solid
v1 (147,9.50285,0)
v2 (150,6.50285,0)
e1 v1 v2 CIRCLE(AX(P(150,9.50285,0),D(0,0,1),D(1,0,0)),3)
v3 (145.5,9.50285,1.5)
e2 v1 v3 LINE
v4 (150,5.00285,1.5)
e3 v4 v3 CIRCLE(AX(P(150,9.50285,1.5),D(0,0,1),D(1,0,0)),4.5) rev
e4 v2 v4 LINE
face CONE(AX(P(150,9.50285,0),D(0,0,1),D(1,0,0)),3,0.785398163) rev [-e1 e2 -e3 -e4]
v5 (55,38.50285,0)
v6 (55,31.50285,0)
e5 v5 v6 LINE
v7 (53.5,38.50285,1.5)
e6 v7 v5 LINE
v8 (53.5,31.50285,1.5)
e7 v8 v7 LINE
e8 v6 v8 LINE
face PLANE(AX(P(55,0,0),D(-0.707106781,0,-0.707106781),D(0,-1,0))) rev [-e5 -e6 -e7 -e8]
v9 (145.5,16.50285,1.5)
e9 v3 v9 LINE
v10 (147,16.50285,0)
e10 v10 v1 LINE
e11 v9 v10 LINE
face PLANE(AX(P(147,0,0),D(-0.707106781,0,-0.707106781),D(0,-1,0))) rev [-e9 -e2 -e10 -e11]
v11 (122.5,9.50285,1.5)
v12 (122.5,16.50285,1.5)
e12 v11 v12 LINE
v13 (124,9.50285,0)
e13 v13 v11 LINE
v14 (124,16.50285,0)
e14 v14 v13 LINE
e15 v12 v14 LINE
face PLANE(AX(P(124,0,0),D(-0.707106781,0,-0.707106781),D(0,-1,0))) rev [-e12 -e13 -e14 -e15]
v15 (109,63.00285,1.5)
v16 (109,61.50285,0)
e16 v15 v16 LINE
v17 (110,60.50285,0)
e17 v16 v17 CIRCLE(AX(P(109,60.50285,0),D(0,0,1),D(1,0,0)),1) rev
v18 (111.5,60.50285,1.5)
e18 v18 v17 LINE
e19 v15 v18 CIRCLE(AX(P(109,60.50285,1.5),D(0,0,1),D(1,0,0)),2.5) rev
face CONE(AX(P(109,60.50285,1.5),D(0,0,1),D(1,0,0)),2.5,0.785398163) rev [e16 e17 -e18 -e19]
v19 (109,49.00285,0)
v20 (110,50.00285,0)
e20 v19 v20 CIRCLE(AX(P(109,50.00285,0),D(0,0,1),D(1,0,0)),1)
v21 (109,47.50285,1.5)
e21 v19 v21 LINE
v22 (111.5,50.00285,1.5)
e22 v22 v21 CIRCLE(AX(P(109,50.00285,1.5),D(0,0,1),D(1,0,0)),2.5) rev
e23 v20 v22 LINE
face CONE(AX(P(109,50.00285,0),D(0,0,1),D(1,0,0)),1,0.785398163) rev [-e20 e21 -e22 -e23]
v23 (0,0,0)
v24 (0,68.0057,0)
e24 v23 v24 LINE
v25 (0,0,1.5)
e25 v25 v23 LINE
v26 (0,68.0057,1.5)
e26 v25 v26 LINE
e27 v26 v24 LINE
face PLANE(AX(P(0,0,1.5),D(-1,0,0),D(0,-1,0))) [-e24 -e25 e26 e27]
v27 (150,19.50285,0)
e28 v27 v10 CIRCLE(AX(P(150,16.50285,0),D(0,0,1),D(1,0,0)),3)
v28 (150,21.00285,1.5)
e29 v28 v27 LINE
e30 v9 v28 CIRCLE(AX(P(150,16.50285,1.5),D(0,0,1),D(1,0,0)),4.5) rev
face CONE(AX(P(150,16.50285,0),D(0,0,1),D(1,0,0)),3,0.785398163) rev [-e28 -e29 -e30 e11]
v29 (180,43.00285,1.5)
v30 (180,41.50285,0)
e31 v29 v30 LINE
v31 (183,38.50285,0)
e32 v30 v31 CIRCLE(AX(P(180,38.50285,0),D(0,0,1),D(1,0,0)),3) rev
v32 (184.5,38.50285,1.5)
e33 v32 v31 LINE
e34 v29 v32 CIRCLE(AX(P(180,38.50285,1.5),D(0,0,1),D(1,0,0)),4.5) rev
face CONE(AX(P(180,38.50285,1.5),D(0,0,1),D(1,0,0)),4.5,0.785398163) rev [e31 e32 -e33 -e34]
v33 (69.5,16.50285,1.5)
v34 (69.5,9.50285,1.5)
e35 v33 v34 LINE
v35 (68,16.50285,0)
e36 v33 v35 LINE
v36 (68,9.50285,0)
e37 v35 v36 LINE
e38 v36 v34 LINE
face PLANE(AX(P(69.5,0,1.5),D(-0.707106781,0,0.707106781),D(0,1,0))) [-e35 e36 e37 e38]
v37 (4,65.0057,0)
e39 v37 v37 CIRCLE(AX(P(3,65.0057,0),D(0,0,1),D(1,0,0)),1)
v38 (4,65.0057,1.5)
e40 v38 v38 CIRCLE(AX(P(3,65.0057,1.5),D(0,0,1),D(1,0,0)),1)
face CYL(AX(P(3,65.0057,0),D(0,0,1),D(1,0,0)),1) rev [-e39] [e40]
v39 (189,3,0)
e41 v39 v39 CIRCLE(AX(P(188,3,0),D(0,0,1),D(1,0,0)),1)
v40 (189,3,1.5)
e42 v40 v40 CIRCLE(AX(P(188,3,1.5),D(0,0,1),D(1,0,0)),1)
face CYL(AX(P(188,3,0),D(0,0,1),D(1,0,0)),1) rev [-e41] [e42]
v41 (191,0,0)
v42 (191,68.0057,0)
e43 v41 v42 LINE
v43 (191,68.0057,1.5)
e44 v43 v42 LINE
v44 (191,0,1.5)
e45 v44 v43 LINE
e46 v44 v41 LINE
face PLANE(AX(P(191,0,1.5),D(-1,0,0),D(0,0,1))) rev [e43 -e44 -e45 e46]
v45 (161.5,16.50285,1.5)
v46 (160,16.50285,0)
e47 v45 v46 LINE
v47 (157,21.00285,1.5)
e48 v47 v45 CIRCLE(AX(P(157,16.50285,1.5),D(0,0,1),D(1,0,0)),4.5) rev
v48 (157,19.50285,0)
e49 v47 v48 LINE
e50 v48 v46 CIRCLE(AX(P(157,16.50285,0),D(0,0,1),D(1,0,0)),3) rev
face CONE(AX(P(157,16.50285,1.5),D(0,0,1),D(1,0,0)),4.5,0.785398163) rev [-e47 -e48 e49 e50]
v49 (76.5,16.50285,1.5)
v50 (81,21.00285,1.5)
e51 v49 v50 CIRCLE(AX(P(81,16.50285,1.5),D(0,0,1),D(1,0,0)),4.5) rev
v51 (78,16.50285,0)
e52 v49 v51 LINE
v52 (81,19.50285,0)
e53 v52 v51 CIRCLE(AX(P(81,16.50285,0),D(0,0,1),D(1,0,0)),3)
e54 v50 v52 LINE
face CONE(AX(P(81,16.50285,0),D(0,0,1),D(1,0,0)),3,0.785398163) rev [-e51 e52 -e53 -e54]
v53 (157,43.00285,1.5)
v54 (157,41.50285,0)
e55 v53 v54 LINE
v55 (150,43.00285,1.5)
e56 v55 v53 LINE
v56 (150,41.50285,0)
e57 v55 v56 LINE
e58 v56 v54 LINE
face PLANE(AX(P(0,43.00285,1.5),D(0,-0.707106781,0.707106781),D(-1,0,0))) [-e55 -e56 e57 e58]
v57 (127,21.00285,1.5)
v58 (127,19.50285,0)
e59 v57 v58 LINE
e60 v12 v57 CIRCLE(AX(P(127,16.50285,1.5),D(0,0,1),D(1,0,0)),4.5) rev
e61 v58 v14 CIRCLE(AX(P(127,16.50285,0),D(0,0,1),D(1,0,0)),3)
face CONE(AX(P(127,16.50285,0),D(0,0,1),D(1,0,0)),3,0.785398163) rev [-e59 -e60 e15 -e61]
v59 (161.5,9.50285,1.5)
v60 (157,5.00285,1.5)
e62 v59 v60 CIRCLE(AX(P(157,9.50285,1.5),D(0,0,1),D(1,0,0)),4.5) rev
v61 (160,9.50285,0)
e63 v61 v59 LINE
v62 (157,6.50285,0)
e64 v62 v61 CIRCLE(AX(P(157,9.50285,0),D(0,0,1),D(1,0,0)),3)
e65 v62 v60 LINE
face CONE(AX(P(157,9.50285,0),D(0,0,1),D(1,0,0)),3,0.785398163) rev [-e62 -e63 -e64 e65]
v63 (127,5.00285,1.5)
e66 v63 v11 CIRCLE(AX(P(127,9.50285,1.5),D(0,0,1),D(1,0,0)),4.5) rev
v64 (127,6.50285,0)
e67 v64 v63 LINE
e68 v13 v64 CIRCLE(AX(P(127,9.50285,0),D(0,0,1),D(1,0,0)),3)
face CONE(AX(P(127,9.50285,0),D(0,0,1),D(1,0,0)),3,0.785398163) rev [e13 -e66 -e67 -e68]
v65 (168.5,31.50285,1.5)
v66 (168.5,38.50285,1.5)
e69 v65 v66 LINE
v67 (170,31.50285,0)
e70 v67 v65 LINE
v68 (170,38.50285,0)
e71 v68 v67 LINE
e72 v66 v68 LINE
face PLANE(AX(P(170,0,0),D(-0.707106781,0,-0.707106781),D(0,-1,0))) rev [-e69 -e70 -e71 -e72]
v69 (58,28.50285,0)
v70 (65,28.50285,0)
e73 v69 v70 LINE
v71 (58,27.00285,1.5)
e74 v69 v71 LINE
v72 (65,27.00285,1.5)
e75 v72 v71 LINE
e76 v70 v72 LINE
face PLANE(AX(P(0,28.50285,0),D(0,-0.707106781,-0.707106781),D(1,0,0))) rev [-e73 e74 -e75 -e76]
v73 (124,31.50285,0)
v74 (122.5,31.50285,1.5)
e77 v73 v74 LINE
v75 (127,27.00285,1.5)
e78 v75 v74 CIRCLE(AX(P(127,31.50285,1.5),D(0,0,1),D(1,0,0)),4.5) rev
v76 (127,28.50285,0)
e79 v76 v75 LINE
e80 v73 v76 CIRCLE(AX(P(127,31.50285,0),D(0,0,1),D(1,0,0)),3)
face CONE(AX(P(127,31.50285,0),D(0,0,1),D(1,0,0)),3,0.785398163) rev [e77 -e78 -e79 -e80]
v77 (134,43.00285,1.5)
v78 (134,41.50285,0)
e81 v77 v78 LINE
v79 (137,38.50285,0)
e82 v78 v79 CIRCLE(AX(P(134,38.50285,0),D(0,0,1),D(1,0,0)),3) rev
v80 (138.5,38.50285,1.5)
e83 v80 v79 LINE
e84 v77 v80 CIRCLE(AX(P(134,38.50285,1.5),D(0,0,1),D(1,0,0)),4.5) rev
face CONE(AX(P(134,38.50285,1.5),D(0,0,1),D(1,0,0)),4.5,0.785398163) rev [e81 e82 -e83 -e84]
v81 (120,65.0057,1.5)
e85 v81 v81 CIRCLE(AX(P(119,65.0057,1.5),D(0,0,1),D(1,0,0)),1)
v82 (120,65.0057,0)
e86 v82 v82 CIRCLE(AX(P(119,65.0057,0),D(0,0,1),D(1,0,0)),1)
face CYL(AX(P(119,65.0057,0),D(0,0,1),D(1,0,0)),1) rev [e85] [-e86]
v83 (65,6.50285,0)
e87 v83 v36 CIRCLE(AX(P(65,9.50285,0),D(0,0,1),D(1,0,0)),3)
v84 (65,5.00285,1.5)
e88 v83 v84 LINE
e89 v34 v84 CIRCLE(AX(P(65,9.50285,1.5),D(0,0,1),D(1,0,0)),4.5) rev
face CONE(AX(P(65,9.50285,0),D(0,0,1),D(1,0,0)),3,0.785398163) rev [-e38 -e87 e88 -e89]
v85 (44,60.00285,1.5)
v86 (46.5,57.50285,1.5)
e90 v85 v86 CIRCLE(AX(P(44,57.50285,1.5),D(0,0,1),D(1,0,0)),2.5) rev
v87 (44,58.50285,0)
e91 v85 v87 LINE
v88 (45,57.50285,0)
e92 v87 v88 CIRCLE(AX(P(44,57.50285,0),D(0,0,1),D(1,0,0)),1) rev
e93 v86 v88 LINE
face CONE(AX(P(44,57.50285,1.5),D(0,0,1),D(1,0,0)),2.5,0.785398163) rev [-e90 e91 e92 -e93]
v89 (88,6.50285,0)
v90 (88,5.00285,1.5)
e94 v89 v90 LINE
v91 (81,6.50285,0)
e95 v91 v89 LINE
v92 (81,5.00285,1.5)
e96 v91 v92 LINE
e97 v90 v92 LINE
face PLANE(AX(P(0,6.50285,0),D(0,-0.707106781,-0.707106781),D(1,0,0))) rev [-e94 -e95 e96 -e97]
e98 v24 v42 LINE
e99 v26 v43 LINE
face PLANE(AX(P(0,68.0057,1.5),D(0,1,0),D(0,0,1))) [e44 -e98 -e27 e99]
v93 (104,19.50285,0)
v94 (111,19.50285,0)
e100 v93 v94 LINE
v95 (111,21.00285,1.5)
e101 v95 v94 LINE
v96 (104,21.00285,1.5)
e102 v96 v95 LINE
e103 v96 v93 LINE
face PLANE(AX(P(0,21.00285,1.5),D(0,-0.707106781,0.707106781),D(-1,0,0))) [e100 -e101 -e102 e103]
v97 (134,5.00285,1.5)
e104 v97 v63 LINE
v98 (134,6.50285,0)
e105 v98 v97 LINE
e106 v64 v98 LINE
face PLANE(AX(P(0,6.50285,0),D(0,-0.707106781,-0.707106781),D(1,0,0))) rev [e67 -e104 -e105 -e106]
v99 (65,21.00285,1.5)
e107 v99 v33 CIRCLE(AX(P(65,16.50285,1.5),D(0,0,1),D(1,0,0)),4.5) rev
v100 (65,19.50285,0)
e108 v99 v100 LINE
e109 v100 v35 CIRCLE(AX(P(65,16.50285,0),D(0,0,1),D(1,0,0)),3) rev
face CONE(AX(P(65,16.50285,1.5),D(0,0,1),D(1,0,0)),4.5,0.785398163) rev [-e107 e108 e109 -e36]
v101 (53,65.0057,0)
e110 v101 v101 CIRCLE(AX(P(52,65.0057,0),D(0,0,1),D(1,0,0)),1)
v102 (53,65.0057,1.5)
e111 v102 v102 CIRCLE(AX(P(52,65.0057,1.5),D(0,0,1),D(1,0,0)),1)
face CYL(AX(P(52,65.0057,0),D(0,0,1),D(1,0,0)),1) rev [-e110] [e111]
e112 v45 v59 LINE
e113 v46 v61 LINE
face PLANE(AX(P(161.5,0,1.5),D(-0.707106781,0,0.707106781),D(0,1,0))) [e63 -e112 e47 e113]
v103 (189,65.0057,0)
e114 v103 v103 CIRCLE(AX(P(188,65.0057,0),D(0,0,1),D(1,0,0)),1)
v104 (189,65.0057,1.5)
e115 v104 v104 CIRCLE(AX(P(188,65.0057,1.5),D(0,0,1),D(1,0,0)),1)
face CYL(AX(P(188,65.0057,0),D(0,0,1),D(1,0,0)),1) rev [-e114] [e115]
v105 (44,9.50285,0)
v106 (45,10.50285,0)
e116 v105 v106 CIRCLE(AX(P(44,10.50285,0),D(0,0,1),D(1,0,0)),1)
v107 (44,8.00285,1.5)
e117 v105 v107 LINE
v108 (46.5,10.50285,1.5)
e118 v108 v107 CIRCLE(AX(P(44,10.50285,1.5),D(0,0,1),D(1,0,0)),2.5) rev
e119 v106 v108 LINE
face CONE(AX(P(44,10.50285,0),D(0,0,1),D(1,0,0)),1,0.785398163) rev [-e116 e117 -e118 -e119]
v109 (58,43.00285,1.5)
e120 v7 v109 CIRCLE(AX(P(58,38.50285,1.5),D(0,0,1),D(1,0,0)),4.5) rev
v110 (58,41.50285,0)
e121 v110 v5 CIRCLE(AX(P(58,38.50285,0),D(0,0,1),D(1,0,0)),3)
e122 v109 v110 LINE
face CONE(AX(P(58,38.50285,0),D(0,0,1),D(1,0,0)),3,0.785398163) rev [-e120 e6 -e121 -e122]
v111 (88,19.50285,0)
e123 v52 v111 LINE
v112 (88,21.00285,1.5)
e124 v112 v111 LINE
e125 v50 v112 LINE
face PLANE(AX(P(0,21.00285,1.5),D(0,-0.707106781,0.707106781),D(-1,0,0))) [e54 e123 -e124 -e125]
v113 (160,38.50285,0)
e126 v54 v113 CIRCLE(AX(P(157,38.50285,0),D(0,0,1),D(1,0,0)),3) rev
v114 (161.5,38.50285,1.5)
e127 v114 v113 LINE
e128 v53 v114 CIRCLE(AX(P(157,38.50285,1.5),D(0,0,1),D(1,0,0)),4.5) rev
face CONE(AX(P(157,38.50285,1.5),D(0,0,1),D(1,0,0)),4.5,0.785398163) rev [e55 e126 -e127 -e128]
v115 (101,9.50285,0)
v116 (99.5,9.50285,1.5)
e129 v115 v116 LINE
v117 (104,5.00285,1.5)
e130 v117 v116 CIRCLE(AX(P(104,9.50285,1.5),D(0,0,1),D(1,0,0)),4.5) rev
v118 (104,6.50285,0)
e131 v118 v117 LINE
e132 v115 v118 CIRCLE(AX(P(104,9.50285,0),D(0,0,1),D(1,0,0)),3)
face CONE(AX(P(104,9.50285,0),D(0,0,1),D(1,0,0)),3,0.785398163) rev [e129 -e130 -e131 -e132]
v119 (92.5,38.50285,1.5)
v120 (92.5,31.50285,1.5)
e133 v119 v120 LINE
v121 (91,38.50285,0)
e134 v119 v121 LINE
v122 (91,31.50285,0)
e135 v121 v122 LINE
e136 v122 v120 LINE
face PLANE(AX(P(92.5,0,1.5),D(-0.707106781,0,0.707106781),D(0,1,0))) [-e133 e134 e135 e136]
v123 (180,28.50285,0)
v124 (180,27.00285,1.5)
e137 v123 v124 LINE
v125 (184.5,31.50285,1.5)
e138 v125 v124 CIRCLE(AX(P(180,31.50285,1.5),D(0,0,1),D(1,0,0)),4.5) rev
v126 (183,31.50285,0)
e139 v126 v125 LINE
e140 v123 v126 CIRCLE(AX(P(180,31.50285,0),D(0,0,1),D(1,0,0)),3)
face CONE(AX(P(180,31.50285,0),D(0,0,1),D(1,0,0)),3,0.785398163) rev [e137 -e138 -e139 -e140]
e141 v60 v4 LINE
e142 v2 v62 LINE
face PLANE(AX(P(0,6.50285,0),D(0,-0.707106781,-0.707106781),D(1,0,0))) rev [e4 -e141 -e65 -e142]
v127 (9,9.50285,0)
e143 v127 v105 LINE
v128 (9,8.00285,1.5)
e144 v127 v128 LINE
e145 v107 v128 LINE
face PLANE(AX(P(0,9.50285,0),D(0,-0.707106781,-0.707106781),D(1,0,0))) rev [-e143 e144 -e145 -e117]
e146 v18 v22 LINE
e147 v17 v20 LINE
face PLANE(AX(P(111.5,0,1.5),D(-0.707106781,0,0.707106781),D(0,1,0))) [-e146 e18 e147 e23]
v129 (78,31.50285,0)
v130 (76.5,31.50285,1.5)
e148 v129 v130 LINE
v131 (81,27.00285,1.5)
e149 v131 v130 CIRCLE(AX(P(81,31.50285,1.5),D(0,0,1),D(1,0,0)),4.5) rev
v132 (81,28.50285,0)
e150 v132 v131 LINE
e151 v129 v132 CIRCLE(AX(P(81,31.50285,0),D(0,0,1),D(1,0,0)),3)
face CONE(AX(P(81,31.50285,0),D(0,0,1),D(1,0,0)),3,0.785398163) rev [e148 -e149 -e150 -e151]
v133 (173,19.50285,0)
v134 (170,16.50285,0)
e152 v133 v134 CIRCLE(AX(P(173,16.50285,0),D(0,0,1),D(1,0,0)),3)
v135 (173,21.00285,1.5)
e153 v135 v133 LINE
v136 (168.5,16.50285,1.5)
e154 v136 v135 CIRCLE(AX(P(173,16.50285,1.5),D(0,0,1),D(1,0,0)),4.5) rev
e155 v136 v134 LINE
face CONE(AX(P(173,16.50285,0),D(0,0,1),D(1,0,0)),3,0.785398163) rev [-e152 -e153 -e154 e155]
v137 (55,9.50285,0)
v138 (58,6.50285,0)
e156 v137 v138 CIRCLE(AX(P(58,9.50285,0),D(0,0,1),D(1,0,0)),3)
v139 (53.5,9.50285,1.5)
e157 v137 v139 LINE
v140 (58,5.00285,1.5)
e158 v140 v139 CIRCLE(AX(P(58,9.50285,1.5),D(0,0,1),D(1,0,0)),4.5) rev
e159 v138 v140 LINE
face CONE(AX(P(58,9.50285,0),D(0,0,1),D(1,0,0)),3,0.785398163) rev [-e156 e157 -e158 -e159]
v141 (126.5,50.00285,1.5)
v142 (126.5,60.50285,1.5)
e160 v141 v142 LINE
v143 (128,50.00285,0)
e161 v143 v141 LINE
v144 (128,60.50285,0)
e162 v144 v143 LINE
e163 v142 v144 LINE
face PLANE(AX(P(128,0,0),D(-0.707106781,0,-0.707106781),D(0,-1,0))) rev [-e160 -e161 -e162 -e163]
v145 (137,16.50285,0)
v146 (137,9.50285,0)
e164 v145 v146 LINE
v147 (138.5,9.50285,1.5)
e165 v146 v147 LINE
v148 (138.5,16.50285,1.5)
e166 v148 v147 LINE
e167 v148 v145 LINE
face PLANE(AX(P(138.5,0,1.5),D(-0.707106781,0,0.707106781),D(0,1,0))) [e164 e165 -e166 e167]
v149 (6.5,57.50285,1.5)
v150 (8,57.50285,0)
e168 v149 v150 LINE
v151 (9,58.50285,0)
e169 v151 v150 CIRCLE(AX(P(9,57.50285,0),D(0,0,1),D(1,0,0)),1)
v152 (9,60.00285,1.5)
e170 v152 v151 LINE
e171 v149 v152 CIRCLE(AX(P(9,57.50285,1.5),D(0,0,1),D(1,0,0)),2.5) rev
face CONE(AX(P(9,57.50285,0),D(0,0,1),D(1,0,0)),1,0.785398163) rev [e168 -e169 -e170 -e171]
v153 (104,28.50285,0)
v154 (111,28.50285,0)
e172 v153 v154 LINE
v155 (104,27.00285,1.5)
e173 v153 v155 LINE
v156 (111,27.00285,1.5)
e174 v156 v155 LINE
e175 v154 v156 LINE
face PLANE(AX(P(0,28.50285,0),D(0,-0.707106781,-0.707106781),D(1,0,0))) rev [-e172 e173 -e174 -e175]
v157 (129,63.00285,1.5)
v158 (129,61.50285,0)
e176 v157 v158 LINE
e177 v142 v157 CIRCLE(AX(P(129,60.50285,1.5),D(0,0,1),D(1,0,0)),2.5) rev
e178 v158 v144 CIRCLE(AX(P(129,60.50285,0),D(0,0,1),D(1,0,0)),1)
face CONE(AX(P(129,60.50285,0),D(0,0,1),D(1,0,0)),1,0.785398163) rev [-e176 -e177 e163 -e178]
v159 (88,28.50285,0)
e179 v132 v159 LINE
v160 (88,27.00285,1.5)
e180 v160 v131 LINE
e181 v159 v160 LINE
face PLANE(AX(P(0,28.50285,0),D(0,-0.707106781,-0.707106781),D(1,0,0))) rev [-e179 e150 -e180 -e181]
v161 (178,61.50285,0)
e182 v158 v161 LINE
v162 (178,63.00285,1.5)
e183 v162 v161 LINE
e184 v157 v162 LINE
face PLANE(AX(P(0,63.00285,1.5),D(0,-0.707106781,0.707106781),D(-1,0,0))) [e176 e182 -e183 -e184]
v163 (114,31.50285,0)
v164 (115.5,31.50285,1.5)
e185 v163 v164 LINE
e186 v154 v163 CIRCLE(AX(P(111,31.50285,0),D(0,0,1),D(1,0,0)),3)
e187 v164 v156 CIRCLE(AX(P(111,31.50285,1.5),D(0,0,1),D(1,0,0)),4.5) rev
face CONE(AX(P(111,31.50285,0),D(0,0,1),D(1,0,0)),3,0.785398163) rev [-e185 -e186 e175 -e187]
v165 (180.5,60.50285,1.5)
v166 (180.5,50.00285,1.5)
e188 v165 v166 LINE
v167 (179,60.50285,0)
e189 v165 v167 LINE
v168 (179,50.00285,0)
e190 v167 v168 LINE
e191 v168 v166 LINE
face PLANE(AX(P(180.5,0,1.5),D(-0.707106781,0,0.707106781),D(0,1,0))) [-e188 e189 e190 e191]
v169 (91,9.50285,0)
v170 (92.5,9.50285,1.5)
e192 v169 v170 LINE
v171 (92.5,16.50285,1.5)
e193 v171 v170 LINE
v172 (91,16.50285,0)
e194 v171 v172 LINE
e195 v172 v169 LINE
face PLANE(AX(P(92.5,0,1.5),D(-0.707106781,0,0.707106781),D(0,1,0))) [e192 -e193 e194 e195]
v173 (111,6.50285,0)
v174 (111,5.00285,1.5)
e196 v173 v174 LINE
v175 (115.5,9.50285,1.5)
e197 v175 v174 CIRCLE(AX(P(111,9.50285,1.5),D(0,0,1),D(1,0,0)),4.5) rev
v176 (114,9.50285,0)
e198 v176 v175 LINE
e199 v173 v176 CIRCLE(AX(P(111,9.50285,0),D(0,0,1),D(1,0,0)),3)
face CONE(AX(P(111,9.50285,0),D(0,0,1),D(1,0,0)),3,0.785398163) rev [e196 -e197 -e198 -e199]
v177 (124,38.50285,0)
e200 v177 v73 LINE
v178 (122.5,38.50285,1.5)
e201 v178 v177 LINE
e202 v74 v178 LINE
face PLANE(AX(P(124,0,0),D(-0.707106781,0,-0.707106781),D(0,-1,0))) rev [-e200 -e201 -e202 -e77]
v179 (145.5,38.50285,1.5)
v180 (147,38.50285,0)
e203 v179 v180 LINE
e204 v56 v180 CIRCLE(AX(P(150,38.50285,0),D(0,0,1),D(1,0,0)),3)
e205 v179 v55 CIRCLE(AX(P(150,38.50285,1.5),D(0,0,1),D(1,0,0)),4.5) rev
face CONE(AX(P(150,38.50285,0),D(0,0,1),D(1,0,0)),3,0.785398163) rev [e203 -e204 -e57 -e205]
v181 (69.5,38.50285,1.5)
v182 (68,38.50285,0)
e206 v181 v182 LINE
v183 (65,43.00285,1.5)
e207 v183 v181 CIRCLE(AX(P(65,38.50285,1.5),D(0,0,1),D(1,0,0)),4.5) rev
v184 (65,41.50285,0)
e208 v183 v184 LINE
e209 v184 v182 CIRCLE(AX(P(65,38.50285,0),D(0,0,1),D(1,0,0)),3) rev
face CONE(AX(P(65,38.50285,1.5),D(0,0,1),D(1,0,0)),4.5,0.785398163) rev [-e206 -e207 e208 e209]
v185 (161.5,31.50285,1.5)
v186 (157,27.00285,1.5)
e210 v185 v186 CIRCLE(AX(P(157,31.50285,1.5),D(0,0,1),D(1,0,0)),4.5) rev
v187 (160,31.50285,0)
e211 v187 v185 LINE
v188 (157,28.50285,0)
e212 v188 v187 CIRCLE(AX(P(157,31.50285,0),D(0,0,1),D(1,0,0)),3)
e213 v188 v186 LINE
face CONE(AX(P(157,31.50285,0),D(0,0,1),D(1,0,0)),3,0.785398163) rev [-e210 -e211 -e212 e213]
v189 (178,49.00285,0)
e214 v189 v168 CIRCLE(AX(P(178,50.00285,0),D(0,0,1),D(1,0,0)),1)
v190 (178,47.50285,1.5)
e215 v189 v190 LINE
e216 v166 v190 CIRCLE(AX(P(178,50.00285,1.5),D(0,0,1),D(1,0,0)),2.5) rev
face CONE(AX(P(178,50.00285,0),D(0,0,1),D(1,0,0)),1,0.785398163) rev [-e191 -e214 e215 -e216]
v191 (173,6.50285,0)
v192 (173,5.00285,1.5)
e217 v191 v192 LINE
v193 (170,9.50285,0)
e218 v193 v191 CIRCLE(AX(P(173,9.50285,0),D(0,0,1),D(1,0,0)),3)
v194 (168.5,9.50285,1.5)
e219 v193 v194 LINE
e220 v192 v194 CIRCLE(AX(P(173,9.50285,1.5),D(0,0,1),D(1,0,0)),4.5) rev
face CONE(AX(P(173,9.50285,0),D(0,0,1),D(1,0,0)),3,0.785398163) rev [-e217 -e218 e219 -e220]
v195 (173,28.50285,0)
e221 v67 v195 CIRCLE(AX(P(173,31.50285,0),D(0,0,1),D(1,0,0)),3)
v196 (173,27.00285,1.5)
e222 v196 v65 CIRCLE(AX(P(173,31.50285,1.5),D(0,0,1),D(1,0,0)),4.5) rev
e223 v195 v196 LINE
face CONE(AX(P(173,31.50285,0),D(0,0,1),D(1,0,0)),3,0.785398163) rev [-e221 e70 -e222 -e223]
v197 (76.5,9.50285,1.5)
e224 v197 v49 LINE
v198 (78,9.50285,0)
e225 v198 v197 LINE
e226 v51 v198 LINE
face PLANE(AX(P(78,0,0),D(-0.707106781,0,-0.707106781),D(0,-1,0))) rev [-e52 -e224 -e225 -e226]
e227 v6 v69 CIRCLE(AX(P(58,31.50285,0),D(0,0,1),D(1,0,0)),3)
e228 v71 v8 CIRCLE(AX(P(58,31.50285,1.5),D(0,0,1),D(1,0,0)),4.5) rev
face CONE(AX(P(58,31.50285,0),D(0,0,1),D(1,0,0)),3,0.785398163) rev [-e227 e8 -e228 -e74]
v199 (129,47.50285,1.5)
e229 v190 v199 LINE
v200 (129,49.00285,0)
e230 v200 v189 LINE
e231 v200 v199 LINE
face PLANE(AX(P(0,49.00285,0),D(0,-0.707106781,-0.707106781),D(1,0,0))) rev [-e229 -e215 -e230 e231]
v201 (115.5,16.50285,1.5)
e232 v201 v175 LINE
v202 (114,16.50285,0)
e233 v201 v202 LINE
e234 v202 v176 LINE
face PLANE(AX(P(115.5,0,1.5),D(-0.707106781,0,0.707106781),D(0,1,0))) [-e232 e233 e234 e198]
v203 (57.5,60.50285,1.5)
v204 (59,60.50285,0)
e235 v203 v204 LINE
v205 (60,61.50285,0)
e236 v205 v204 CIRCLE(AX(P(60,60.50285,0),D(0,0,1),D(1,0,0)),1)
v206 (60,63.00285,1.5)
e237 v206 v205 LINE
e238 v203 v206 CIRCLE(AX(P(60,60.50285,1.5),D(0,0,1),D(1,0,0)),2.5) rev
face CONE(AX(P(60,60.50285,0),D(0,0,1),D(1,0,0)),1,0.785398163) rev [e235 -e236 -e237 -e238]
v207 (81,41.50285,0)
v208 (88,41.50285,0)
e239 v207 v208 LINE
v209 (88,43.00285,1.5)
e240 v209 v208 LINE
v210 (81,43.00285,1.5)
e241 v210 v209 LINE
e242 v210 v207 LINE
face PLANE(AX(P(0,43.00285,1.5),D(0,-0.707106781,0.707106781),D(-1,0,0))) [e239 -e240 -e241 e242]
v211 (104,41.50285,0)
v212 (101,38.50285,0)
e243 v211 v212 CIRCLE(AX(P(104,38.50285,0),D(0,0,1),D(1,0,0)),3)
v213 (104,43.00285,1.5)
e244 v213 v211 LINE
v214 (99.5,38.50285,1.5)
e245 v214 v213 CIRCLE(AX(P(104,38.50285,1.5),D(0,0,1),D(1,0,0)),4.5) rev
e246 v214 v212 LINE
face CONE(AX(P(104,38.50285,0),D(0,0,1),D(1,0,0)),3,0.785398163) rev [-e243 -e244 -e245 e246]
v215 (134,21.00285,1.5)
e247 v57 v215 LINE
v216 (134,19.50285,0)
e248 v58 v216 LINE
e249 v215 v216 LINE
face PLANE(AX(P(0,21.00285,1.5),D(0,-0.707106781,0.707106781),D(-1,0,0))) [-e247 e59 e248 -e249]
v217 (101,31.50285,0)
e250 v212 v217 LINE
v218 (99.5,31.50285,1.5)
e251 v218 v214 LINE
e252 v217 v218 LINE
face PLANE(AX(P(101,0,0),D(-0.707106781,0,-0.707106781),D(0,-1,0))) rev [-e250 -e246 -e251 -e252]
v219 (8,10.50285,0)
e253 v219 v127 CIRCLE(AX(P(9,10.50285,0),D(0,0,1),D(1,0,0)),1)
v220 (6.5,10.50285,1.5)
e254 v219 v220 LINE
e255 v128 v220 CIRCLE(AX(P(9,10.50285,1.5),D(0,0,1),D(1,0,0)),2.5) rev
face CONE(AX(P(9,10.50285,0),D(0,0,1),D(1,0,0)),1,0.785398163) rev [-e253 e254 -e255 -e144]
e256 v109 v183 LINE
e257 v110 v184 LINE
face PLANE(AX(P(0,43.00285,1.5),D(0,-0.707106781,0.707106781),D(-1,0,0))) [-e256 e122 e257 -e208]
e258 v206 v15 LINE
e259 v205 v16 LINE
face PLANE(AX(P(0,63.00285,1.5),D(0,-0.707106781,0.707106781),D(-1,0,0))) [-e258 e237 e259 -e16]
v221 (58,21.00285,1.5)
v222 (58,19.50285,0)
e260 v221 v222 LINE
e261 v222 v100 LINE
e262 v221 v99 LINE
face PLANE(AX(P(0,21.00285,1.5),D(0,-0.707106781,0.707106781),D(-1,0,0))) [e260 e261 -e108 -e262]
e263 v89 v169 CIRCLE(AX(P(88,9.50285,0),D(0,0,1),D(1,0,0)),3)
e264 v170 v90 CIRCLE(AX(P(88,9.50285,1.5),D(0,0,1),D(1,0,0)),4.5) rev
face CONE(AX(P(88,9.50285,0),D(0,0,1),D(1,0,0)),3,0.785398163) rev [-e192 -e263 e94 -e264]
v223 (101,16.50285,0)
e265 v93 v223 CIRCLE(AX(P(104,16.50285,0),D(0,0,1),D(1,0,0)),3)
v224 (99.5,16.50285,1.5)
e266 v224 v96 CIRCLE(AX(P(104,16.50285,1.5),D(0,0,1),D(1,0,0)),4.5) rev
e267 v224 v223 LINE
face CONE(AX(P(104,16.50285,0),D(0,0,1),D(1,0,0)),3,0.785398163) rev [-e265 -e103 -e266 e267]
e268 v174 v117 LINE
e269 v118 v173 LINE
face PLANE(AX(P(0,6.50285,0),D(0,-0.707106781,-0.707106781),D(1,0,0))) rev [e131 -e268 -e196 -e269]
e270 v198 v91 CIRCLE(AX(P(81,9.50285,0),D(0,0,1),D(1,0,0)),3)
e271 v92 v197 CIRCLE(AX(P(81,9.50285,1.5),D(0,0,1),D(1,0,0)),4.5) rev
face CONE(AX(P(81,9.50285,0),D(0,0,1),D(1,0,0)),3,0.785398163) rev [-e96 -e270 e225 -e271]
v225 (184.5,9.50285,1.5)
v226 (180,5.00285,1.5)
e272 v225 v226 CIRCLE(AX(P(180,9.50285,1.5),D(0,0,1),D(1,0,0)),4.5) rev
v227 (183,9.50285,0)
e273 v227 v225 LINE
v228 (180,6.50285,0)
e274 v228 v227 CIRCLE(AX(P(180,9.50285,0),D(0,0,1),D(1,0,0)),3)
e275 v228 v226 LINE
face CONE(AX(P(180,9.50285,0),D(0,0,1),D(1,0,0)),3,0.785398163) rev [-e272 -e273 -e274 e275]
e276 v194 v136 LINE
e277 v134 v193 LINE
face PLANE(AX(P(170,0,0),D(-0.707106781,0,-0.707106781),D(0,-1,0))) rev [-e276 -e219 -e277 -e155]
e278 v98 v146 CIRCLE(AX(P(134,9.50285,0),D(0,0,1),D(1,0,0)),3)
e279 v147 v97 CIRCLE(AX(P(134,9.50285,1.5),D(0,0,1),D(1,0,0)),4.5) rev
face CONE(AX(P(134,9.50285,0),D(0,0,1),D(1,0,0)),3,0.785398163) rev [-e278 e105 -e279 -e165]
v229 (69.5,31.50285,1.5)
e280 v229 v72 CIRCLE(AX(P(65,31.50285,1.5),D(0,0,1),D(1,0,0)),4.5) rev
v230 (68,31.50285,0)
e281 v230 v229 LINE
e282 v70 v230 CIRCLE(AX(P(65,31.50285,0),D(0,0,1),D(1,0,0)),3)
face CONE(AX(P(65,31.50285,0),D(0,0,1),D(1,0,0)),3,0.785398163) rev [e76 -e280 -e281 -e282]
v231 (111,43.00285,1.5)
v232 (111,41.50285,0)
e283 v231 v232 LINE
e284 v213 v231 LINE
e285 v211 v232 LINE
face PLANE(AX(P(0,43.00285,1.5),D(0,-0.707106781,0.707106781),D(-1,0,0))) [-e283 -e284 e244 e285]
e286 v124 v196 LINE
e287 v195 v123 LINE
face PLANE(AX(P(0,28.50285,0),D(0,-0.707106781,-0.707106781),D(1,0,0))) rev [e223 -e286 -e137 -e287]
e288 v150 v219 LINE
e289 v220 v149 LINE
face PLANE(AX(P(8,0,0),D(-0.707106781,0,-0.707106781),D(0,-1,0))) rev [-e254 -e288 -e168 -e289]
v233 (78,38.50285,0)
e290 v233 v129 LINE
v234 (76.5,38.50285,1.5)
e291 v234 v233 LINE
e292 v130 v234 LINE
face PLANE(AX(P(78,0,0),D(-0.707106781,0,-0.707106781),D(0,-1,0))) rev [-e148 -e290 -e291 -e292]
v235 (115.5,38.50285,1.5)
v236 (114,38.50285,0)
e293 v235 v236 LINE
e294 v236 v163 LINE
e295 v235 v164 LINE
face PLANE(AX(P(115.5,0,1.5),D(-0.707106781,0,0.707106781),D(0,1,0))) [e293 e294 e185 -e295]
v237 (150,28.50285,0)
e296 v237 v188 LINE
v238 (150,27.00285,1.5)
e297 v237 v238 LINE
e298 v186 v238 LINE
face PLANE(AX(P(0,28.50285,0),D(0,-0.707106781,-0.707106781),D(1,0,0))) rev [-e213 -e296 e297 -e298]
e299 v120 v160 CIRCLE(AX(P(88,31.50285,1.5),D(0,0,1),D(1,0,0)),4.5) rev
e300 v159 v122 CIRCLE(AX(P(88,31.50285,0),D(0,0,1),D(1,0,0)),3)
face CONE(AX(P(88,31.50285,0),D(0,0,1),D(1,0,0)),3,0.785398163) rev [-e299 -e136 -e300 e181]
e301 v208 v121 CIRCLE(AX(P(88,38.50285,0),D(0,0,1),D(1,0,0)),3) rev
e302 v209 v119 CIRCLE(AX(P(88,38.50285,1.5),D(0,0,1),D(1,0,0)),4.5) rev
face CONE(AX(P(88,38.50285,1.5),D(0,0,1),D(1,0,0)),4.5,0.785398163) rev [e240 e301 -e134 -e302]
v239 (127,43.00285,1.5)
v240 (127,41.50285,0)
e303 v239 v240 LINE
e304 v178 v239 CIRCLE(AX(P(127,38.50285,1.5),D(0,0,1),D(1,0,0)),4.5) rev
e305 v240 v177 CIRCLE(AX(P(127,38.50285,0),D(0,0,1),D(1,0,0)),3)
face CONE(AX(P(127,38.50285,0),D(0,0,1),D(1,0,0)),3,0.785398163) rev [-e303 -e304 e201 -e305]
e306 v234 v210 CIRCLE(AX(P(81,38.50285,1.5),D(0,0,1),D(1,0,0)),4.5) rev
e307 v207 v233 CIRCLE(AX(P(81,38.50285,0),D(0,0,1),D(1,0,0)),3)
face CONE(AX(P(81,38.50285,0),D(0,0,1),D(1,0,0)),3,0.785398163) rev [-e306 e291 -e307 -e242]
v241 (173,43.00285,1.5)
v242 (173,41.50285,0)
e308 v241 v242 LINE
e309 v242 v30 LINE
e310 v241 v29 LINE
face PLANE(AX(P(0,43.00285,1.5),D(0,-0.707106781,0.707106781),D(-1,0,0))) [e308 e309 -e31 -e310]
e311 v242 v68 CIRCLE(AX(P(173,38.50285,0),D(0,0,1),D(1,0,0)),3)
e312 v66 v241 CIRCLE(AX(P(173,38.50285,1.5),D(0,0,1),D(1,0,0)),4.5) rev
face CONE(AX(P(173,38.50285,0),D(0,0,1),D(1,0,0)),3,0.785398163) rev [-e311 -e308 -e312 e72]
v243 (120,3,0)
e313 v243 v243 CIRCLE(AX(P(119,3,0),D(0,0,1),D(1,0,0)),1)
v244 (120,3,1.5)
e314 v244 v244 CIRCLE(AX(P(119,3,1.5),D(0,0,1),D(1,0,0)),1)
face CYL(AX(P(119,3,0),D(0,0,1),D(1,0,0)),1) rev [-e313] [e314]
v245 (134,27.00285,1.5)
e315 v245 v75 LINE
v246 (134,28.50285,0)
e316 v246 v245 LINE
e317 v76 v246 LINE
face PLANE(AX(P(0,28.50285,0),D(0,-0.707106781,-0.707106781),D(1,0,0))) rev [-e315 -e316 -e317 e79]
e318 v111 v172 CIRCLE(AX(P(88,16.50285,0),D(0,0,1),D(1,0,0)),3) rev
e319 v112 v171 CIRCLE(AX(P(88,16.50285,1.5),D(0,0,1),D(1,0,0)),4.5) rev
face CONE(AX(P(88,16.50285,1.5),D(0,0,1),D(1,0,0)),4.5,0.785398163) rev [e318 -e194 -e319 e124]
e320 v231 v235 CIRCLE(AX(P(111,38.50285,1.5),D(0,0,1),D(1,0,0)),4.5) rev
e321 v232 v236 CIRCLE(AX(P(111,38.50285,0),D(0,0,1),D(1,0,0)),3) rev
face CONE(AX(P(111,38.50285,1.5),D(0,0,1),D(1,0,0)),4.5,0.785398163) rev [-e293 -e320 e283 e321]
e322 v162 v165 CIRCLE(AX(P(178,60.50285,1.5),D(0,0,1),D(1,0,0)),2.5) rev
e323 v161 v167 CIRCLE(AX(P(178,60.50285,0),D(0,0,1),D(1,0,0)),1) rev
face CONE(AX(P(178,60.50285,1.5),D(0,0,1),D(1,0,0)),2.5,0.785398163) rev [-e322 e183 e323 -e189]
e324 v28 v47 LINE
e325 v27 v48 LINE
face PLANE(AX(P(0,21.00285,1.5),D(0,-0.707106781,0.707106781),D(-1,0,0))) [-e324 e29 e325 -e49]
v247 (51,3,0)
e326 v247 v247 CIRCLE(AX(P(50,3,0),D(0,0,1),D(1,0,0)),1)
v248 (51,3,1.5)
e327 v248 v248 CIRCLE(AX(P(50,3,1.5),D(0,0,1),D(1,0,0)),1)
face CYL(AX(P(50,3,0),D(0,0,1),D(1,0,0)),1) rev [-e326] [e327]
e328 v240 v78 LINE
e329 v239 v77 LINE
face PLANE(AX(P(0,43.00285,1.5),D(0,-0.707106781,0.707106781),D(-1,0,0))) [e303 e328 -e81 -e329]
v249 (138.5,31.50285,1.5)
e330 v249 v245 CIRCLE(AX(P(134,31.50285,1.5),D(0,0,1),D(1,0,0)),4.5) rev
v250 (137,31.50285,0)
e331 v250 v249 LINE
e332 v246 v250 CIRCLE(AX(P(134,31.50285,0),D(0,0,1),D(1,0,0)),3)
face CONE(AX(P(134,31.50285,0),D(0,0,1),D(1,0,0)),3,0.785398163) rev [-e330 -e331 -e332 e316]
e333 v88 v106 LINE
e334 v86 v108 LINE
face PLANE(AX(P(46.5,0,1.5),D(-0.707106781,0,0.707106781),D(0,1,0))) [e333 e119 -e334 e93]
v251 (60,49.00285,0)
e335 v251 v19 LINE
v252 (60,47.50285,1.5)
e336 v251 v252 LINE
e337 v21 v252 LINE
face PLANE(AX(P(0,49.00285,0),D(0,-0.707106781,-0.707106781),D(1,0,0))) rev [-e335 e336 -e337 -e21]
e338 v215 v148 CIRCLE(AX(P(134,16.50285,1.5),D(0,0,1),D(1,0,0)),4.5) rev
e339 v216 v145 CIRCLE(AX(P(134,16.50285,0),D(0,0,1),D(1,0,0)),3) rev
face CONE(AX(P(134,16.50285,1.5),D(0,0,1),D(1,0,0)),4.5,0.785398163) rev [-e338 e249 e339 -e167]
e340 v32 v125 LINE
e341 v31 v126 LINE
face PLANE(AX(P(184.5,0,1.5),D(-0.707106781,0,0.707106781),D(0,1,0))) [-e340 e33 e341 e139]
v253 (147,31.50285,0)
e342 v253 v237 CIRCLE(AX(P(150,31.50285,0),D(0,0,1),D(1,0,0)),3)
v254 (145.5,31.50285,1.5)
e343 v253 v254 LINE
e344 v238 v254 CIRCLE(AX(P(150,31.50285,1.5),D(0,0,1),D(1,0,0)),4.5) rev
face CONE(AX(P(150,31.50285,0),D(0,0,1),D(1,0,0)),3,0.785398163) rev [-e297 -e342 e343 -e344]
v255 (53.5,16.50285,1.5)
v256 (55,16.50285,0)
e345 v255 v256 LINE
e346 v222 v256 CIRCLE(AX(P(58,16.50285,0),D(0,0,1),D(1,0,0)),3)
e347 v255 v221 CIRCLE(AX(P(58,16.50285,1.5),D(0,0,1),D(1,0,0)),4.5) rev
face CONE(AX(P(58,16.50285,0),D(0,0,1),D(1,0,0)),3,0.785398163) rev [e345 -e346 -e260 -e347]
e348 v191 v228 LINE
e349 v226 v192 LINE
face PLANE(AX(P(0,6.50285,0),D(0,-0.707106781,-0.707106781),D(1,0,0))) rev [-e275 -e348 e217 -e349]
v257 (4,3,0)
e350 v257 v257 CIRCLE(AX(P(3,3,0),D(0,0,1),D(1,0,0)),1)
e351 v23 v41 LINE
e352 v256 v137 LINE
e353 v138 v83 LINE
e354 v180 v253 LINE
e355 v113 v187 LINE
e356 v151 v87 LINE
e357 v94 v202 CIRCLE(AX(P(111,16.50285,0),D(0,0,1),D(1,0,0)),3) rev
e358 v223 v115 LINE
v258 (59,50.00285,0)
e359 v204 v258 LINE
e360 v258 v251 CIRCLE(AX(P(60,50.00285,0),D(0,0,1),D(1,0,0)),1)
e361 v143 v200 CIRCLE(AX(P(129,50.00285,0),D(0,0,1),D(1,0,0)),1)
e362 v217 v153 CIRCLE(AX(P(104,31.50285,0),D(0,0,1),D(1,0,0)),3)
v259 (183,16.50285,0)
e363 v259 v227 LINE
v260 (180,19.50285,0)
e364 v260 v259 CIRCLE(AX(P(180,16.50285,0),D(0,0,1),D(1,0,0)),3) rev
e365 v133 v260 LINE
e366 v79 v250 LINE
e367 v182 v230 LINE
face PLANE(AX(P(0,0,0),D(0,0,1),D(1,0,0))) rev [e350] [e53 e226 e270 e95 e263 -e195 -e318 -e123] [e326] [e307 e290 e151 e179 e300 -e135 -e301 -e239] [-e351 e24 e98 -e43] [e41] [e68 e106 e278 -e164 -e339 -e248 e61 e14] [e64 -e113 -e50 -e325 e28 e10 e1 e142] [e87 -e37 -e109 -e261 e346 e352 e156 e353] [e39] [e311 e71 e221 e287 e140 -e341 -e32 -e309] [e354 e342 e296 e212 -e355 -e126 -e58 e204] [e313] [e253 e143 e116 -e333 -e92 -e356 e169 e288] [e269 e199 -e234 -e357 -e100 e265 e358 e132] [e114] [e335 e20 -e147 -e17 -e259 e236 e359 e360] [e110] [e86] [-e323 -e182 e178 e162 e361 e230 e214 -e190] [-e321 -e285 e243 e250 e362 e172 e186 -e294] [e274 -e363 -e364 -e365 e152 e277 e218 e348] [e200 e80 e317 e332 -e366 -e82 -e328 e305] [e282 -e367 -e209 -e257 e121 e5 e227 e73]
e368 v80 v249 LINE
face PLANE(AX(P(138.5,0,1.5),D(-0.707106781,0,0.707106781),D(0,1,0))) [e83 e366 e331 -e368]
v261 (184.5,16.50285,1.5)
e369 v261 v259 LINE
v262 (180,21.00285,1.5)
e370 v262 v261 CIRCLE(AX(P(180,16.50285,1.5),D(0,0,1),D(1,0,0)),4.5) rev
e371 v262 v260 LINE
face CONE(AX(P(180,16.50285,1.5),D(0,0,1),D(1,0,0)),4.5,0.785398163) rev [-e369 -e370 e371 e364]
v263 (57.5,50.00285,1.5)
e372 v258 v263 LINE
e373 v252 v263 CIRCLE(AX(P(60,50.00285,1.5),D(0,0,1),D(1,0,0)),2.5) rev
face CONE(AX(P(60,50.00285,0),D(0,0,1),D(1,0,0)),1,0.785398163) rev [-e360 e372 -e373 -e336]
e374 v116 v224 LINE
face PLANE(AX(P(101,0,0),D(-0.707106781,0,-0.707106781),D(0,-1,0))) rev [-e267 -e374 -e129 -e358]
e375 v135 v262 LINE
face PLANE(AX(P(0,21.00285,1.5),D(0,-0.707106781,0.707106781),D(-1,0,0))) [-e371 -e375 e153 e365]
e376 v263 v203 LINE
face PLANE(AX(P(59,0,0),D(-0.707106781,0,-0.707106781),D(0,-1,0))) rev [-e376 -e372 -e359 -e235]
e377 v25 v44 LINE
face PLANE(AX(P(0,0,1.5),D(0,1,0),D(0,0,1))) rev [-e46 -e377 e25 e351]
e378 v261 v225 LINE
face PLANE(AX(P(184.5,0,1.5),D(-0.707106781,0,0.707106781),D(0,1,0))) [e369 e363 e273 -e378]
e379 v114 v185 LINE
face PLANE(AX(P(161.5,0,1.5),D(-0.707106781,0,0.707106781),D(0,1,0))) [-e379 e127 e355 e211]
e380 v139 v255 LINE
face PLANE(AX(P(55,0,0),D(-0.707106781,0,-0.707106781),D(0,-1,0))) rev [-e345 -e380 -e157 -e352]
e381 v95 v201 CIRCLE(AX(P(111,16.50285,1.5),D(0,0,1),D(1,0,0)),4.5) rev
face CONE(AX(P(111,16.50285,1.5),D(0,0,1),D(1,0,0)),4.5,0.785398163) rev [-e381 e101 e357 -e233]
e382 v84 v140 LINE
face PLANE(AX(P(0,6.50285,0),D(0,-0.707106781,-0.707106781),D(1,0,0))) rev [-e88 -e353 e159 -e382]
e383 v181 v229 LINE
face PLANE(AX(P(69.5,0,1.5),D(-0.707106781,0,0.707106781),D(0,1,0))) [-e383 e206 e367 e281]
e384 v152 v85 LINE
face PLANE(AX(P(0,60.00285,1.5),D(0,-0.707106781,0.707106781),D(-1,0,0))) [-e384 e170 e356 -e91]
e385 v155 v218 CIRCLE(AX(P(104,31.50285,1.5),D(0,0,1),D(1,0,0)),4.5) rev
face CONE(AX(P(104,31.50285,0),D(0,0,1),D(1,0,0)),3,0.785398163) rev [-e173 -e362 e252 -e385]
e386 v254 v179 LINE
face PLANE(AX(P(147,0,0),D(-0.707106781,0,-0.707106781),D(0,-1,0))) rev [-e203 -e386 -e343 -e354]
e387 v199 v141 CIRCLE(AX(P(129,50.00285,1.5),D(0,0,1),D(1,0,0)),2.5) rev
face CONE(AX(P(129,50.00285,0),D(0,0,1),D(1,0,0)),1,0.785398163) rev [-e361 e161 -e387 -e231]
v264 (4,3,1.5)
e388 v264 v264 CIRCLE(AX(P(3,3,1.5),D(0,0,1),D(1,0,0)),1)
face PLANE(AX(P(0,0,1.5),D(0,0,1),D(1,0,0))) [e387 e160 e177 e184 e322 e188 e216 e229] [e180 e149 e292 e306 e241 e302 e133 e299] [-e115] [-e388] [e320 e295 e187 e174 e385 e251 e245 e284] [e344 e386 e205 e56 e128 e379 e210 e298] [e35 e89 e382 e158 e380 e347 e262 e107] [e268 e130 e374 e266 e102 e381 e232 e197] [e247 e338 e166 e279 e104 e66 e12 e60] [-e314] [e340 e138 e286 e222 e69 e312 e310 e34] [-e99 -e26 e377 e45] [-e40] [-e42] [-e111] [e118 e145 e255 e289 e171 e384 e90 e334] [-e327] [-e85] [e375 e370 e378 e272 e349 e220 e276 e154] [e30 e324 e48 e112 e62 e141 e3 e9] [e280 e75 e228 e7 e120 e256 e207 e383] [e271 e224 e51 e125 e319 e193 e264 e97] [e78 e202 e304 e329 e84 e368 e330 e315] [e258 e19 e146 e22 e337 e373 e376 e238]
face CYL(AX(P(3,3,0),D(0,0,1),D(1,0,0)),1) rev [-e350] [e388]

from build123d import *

# Parameters (mm, degrees)
SKETCH1_W                = 191
SKETCH1_H                = 68.005699598
MAIN_PANEL_EXTRUDE_DEPTH = 1.5
CHAMFERS_SIZE            = 1.5
SCREWHOLES_DEPTH         = 203.751141003
SCREWHOLES_DEPTH_BACK    = 203.751141003
SKETCH4_R                = 1


with BuildPart() as part:
    # Sketch1 → Main panel extrude (new body)
    with BuildSketch(Plane.XY):
        with Locations((95.5, 34.002849799)):
            Rectangle(SKETCH1_W, SKETCH1_H)
        with BuildLine():
            Line((9, 58.502849799), (44, 58.502849799))
            ThreePointArc((44, 58.502849799), (44.707106781, 58.20995658), (45, 57.502849799))
            Line((45, 57.502849799), (45, 10.502849799))
            ThreePointArc((45, 10.502849799), (44.707106781, 9.795743018), (44, 9.502849799))
            Line((44, 9.502849799), (9, 9.502849799))
            ThreePointArc((9, 9.502849799), (8.292893219, 9.795743018), (8, 10.502849799))
            Line((8, 10.502849799), (8, 57.502849799))
            ThreePointArc((8, 57.502849799), (8.292893219, 58.20995658), (9, 58.502849799))
        make_face(mode=Mode.SUBTRACT)
        with BuildLine():
            Line((58, 41.502849799), (65, 41.502849799))
            ThreePointArc((65, 41.502849799), (67.121320344, 40.624170143), (68, 38.502849799))
            Line((68, 38.502849799), (68, 31.502849799))
            ThreePointArc((68, 31.502849799), (67.121320344, 29.381529456), (65, 28.502849799))
            Line((65, 28.502849799), (58, 28.502849799))
            ThreePointArc((58, 28.502849799), (55.878679656, 29.381529456), (55, 31.502849799))
            Line((55, 31.502849799), (55, 38.502849799))
            ThreePointArc((55, 38.502849799), (55.878679656, 40.624170143), (58, 41.502849799))
        make_face(mode=Mode.SUBTRACT)
        with BuildLine():
            Line((60, 61.502849799), (109, 61.502849799))
            ThreePointArc((109, 61.502849799), (109.707106781, 61.20995658), (110, 60.502849799))
            Line((110, 60.502849799), (110, 50.002849799))
            ThreePointArc((110, 50.002849799), (109.707106781, 49.295743018), (109, 49.002849799))
            Line((109, 49.002849799), (60, 49.002849799))
            ThreePointArc((60, 49.002849799), (59.292893219, 49.295743018), (59, 50.002849799))
            Line((59, 50.002849799), (59, 60.502849799))
            ThreePointArc((59, 60.502849799), (59.292893219, 61.20995658), (60, 61.502849799))
        make_face(mode=Mode.SUBTRACT)
        with BuildLine():
            Line((81, 41.502849799), (88, 41.502849799))
            ThreePointArc((88, 41.502849799), (90.121320344, 40.624170143), (91, 38.502849799))
            Line((91, 38.502849799), (91, 31.502849799))
            ThreePointArc((91, 31.502849799), (90.121320344, 29.381529456), (88, 28.502849799))
            Line((88, 28.502849799), (81, 28.502849799))
            ThreePointArc((81, 28.502849799), (78.878679656, 29.381529456), (78, 31.502849799))
            Line((78, 31.502849799), (78, 38.502849799))
            ThreePointArc((78, 38.502849799), (78.878679656, 40.624170143), (81, 41.502849799))
        make_face(mode=Mode.SUBTRACT)
        with BuildLine():
            Line((58, 19.502849799), (65, 19.502849799))
            ThreePointArc((65, 19.502849799), (67.121320344, 18.624170143), (68, 16.502849799))
            Line((68, 16.502849799), (68, 9.502849799))
            ThreePointArc((68, 9.502849799), (67.121320344, 7.381529456), (65, 6.502849799))
            Line((65, 6.502849799), (58, 6.502849799))
            ThreePointArc((58, 6.502849799), (55.878679656, 7.381529456), (55, 9.502849799))
            Line((55, 9.502849799), (55, 16.502849799))
            ThreePointArc((55, 16.502849799), (55.878679656, 18.624170143), (58, 19.502849799))
        make_face(mode=Mode.SUBTRACT)
        with BuildLine():
            Line((81, 19.502849799), (88, 19.502849799))
            ThreePointArc((88, 19.502849799), (90.121320344, 18.624170143), (91, 16.502849799))
            Line((91, 16.502849799), (91, 9.502849799))
            ThreePointArc((91, 9.502849799), (90.121320344, 7.381529456), (88, 6.502849799))
            Line((88, 6.502849799), (81, 6.502849799))
            ThreePointArc((81, 6.502849799), (78.878679656, 7.381529456), (78, 9.502849799))
            Line((78, 9.502849799), (78, 16.502849799))
            ThreePointArc((78, 16.502849799), (78.878679656, 18.624170143), (81, 19.502849799))
        make_face(mode=Mode.SUBTRACT)
        with BuildLine():
            Line((104, 41.502849799), (111, 41.502849799))
            ThreePointArc((111, 41.502849799), (113.121320344, 40.624170143), (114, 38.502849799))
            Line((114, 38.502849799), (114, 31.502849799))
            ThreePointArc((114, 31.502849799), (113.121320344, 29.381529456), (111, 28.502849799))
            Line((111, 28.502849799), (104, 28.502849799))
            ThreePointArc((104, 28.502849799), (101.878679656, 29.381529456), (101, 31.502849799))
            Line((101, 31.502849799), (101, 38.502849799))
            ThreePointArc((101, 38.502849799), (101.878679656, 40.624170143), (104, 41.502849799))
        make_face(mode=Mode.SUBTRACT)
        with BuildLine():
            Line((104, 19.502849799), (111, 19.502849799))
            ThreePointArc((111, 19.502849799), (113.121320344, 18.624170143), (114, 16.502849799))
            Line((114, 16.502849799), (114, 9.502849799))
            ThreePointArc((114, 9.502849799), (113.121320344, 7.381529456), (111, 6.502849799))
            Line((111, 6.502849799), (104, 6.502849799))
            ThreePointArc((104, 6.502849799), (101.878679656, 7.381529456), (101, 9.502849799))
            Line((101, 9.502849799), (101, 16.502849799))
            ThreePointArc((101, 16.502849799), (101.878679656, 18.624170143), (104, 19.502849799))
        make_face(mode=Mode.SUBTRACT)
        with BuildLine():
            Line((127, 41.502849799), (134, 41.502849799))
            ThreePointArc((134, 41.502849799), (136.121320344, 40.624170143), (137, 38.502849799))
            Line((137, 38.502849799), (137, 31.502849799))
            ThreePointArc((137, 31.502849799), (136.121320344, 29.381529456), (134, 28.502849799))
            Line((134, 28.502849799), (127, 28.502849799))
            ThreePointArc((127, 28.502849799), (124.878679656, 29.381529456), (124, 31.502849799))
            Line((124, 31.502849799), (124, 38.502849799))
            ThreePointArc((124, 38.502849799), (124.878679656, 40.624170143), (127, 41.502849799))
        make_face(mode=Mode.SUBTRACT)
        with BuildLine():
            Line((129, 61.502849799), (178, 61.502849799))
            ThreePointArc((178, 61.502849799), (178.707106781, 61.20995658), (179, 60.502849799))
            Line((179, 60.502849799), (179, 50.002849799))
            ThreePointArc((179, 50.002849799), (178.707106781, 49.295743018), (178, 49.002849799))
            Line((178, 49.002849799), (129, 49.002849799))
            ThreePointArc((129, 49.002849799), (128.292893219, 49.295743018), (128, 50.002849799))
            Line((128, 50.002849799), (128, 60.502849799))
            ThreePointArc((128, 60.502849799), (128.292893219, 61.20995658), (129, 61.502849799))
        make_face(mode=Mode.SUBTRACT)
        with BuildLine():
            Line((150, 41.502849799), (157, 41.502849799))
            ThreePointArc((157, 41.502849799), (159.121320344, 40.624170143), (160, 38.502849799))
            Line((160, 38.502849799), (160, 31.502849799))
            ThreePointArc((160, 31.502849799), (159.121320344, 29.381529456), (157, 28.502849799))
            Line((157, 28.502849799), (150, 28.502849799))
            ThreePointArc((150, 28.502849799), (147.878679656, 29.381529456), (147, 31.502849799))
            Line((147, 31.502849799), (147, 38.502849799))
            ThreePointArc((147, 38.502849799), (147.878679656, 40.624170143), (150, 41.502849799))
        make_face(mode=Mode.SUBTRACT)
        with BuildLine():
            Line((127, 19.502849799), (134, 19.502849799))
            ThreePointArc((134, 19.502849799), (136.121320344, 18.624170143), (137, 16.502849799))
            Line((137, 16.502849799), (137, 9.502849799))
            ThreePointArc((137, 9.502849799), (136.121320344, 7.381529456), (134, 6.502849799))
            Line((134, 6.502849799), (127, 6.502849799))
            ThreePointArc((127, 6.502849799), (124.878679656, 7.381529456), (124, 9.502849799))
            Line((124, 9.502849799), (124, 16.502849799))
            ThreePointArc((124, 16.502849799), (124.878679656, 18.624170143), (127, 19.502849799))
        make_face(mode=Mode.SUBTRACT)
        with BuildLine():
            Line((150, 19.502849799), (157, 19.502849799))
            ThreePointArc((157, 19.502849799), (159.121320344, 18.624170143), (160, 16.502849799))
            Line((160, 16.502849799), (160, 9.502849799))
            ThreePointArc((160, 9.502849799), (159.121320344, 7.381529456), (157, 6.502849799))
            Line((157, 6.502849799), (150, 6.502849799))
            ThreePointArc((150, 6.502849799), (147.878679656, 7.381529456), (147, 9.502849799))
            Line((147, 9.502849799), (147, 16.502849799))
            ThreePointArc((147, 16.502849799), (147.878679656, 18.624170143), (150, 19.502849799))
        make_face(mode=Mode.SUBTRACT)
        with BuildLine():
            Line((173, 41.502849799), (180, 41.502849799))
            ThreePointArc((180, 41.502849799), (182.121320344, 40.624170143), (183, 38.502849799))
            Line((183, 38.502849799), (183, 31.502849799))
            ThreePointArc((183, 31.502849799), (182.121320344, 29.381529456), (180, 28.502849799))
            Line((180, 28.502849799), (173, 28.502849799))
            ThreePointArc((173, 28.502849799), (170.878679656, 29.381529456), (170, 31.502849799))
            Line((170, 31.502849799), (170, 38.502849799))
            ThreePointArc((170, 38.502849799), (170.878679656, 40.624170143), (173, 41.502849799))
        make_face(mode=Mode.SUBTRACT)
        with BuildLine():
            Line((173, 19.502849799), (180, 19.502849799))
            ThreePointArc((180, 19.502849799), (182.121320344, 18.624170143), (183, 16.502849799))
            Line((183, 16.502849799), (183, 9.502849799))
            ThreePointArc((183, 9.502849799), (182.121320344, 7.381529456), (180, 6.502849799))
            Line((180, 6.502849799), (173, 6.502849799))
            ThreePointArc((173, 6.502849799), (170.878679656, 7.381529456), (170, 9.502849799))
            Line((170, 9.502849799), (170, 16.502849799))
            ThreePointArc((170, 16.502849799), (170.878679656, 18.624170143), (173, 19.502849799))
        make_face(mode=Mode.SUBTRACT)
    extrude(amount=MAIN_PANEL_EXTRUDE_DEPTH)

    # Chamfers
    chamfers_edges = [part.edges().sort_by_distance(p)[0] for p in [
        (183, 13.002849799, 1.5),
        (182.121320344, 18.624170143, 1.5),
        (182.121320344, 7.381529456, 1.5),
        (176.5, 19.502849799, 1.5),
        (176.5, 6.502849799, 1.5),
        (170.878679656, 18.624170143, 1.5),
        (170.878679656, 7.381529456, 1.5),
        (170, 13.002849799, 1.5),
        (160, 13.002849799, 1.5),
        (159.121320344, 18.624170143, 1.5),
        (159.121320344, 7.381529456, 1.5),
        (153.5, 19.502849799, 1.5),
        (153.5, 6.502849799, 1.5),
        (147.878679656, 18.624170143, 1.5),
        (147.878679656, 7.381529456, 1.5),
        (147, 13.002849799, 1.5),
        (160, 35.002849799, 1.5),
        (159.121320344, 40.624170143, 1.5),
        (159.121320344, 29.381529456, 1.5),
        (153.5, 41.502849799, 1.5),
        (153.5, 28.502849799, 1.5),
        (147.878679656, 40.624170143, 1.5),
        (147.878679656, 29.381529456, 1.5),
        (147, 35.002849799, 1.5),
        (183, 35.002849799, 1.5),
        (182.121320344, 40.624170143, 1.5),
        (182.121320344, 29.381529456, 1.5),
        (176.5, 41.502849799, 1.5),
        (176.5, 28.502849799, 1.5),
        (170.878679656, 40.624170143, 1.5),
        (170.878679656, 29.381529456, 1.5),
        (170, 35.002849799, 1.5),
        (179, 55.252849799, 1.5),
        (178.707106781, 61.20995658, 1.5),
        (178.707106781, 49.295743018, 1.5),
        (153.5, 61.502849799, 1.5),
        (153.5, 49.002849799, 1.5),
        (128.292893219, 61.20995658, 1.5),
        (128.292893219, 49.295743018, 1.5),
        (128, 55.252849799, 1.5),
        (137, 13.002849799, 1.5),
        (136.121320344, 18.624170143, 1.5),
        (136.121320344, 7.381529456, 1.5),
        (130.5, 19.502849799, 1.5),
        (130.5, 6.502849799, 1.5),
        (124.878679656, 18.624170143, 1.5),
        (124.878679656, 7.381529456, 1.5),
        (124, 13.002849799, 1.5),
        (137, 35.002849799, 1.5),
        (136.121320344, 40.624170143, 1.5),
        (136.121320344, 29.381529456, 1.5),
        (130.5, 41.502849799, 1.5),
        (130.5, 28.502849799, 1.5),
        (124.878679656, 40.624170143, 1.5),
        (124.878679656, 29.381529456, 1.5),
        (124, 35.002849799, 1.5),
        (114, 13.002849799, 1.5),
        (113.121320344, 18.624170143, 1.5),
        (113.121320344, 7.381529456, 1.5),
        (107.5, 19.502849799, 1.5),
        (107.5, 6.502849799, 1.5),
        (101.878679656, 18.624170143, 1.5),
        (101.878679656, 7.381529456, 1.5),
        (101, 13.002849799, 1.5),
        (114, 35.002849799, 1.5),
        (113.121320344, 40.624170143, 1.5),
        (113.121320344, 29.381529456, 1.5),
        (107.5, 41.502849799, 1.5),
        (107.5, 28.502849799, 1.5),
        (101.878679656, 40.624170143, 1.5),
        (101.878679656, 29.381529456, 1.5),
        (101, 35.002849799, 1.5),
        (91, 13.002849799, 1.5),
        (90.121320344, 18.624170143, 1.5),
        (90.121320344, 7.381529456, 1.5),
        (84.5, 19.502849799, 1.5),
        (84.5, 6.502849799, 1.5),
        (78.878679656, 18.624170143, 1.5),
        (78.878679656, 7.381529456, 1.5),
        (78, 13.002849799, 1.5),
        (91, 35.002849799, 1.5),
        (90.121320344, 40.624170143, 1.5),
        (90.121320344, 29.381529456, 1.5),
        (84.5, 41.502849799, 1.5),
        (84.5, 28.502849799, 1.5),
        (78.878679656, 40.624170143, 1.5),
        (78.878679656, 29.381529456, 1.5),
        (78, 35.002849799, 1.5),
        (110, 55.252849799, 1.5),
        (109.707106781, 61.20995658, 1.5),
        (109.707106781, 49.295743018, 1.5),
        (84.5, 61.502849799, 1.5),
        (84.5, 49.002849799, 1.5),
        (59.292893219, 61.20995658, 1.5),
        (59.292893219, 49.295743018, 1.5),
        (59, 55.252849799, 1.5),
        (68, 13.002849799, 1.5),
        (67.121320344, 18.624170143, 1.5),
        (67.121320344, 7.381529456, 1.5),
        (61.5, 19.502849799, 1.5),
        (61.5, 6.502849799, 1.5),
        (55.878679656, 18.624170143, 1.5),
        (55.878679656, 7.381529456, 1.5),
        (55, 13.002849799, 1.5),
        (68, 35.002849799, 1.5),
        (67.121320344, 40.624170143, 1.5),
        (67.121320344, 29.381529456, 1.5),
        (61.5, 41.502849799, 1.5),
        (61.5, 28.502849799, 1.5),
        (55.878679656, 40.624170143, 1.5),
        (55.878679656, 29.381529456, 1.5),
        (55, 35.002849799, 1.5),
        (45, 34.002849799, 1.5),
        (44.707106781, 58.20995658, 1.5),
        (44.707106781, 9.795743018, 1.5),
        (26.5, 58.502849799, 1.5),
        (26.5, 9.502849799, 1.5),
        (8.292893219, 58.20995658, 1.5),
        (8.292893219, 9.795743018, 1.5),
        (8, 34.002849799, 1.5),
    ]]
    chamfer(chamfers_edges, length=CHAMFERS_SIZE - 0.0001)  # a hair under: the kernel refuses the full size

    # Sketch4 → Screwholes (cut, two sides: drawn at the far end of the back side and taken through both)
    with BuildSketch(Plane.XY.offset(1.5).offset(-SCREWHOLES_DEPTH_BACK)):
        with Locations((3, 3)):
            Circle(SKETCH4_R)
        with Locations((50, 3)):
            Circle(SKETCH4_R)
        with Locations((3, 65.005699598)):
            Circle(SKETCH4_R)
        with Locations((119, 3)):
            Circle(SKETCH4_R)
        with Locations((188, 3)):
            Circle(SKETCH4_R)
        with Locations((188, 65.005699598)):
            Circle(SKETCH4_R)
        with Locations((119, 65.005699598)):
            Circle(SKETCH4_R)
        with Locations((52, 65.005699598)):
            Circle(SKETCH4_R)
    extrude(amount=SCREWHOLES_DEPTH + SCREWHOLES_DEPTH_BACK, mode=Mode.SUBTRACT)


solid = part.part
